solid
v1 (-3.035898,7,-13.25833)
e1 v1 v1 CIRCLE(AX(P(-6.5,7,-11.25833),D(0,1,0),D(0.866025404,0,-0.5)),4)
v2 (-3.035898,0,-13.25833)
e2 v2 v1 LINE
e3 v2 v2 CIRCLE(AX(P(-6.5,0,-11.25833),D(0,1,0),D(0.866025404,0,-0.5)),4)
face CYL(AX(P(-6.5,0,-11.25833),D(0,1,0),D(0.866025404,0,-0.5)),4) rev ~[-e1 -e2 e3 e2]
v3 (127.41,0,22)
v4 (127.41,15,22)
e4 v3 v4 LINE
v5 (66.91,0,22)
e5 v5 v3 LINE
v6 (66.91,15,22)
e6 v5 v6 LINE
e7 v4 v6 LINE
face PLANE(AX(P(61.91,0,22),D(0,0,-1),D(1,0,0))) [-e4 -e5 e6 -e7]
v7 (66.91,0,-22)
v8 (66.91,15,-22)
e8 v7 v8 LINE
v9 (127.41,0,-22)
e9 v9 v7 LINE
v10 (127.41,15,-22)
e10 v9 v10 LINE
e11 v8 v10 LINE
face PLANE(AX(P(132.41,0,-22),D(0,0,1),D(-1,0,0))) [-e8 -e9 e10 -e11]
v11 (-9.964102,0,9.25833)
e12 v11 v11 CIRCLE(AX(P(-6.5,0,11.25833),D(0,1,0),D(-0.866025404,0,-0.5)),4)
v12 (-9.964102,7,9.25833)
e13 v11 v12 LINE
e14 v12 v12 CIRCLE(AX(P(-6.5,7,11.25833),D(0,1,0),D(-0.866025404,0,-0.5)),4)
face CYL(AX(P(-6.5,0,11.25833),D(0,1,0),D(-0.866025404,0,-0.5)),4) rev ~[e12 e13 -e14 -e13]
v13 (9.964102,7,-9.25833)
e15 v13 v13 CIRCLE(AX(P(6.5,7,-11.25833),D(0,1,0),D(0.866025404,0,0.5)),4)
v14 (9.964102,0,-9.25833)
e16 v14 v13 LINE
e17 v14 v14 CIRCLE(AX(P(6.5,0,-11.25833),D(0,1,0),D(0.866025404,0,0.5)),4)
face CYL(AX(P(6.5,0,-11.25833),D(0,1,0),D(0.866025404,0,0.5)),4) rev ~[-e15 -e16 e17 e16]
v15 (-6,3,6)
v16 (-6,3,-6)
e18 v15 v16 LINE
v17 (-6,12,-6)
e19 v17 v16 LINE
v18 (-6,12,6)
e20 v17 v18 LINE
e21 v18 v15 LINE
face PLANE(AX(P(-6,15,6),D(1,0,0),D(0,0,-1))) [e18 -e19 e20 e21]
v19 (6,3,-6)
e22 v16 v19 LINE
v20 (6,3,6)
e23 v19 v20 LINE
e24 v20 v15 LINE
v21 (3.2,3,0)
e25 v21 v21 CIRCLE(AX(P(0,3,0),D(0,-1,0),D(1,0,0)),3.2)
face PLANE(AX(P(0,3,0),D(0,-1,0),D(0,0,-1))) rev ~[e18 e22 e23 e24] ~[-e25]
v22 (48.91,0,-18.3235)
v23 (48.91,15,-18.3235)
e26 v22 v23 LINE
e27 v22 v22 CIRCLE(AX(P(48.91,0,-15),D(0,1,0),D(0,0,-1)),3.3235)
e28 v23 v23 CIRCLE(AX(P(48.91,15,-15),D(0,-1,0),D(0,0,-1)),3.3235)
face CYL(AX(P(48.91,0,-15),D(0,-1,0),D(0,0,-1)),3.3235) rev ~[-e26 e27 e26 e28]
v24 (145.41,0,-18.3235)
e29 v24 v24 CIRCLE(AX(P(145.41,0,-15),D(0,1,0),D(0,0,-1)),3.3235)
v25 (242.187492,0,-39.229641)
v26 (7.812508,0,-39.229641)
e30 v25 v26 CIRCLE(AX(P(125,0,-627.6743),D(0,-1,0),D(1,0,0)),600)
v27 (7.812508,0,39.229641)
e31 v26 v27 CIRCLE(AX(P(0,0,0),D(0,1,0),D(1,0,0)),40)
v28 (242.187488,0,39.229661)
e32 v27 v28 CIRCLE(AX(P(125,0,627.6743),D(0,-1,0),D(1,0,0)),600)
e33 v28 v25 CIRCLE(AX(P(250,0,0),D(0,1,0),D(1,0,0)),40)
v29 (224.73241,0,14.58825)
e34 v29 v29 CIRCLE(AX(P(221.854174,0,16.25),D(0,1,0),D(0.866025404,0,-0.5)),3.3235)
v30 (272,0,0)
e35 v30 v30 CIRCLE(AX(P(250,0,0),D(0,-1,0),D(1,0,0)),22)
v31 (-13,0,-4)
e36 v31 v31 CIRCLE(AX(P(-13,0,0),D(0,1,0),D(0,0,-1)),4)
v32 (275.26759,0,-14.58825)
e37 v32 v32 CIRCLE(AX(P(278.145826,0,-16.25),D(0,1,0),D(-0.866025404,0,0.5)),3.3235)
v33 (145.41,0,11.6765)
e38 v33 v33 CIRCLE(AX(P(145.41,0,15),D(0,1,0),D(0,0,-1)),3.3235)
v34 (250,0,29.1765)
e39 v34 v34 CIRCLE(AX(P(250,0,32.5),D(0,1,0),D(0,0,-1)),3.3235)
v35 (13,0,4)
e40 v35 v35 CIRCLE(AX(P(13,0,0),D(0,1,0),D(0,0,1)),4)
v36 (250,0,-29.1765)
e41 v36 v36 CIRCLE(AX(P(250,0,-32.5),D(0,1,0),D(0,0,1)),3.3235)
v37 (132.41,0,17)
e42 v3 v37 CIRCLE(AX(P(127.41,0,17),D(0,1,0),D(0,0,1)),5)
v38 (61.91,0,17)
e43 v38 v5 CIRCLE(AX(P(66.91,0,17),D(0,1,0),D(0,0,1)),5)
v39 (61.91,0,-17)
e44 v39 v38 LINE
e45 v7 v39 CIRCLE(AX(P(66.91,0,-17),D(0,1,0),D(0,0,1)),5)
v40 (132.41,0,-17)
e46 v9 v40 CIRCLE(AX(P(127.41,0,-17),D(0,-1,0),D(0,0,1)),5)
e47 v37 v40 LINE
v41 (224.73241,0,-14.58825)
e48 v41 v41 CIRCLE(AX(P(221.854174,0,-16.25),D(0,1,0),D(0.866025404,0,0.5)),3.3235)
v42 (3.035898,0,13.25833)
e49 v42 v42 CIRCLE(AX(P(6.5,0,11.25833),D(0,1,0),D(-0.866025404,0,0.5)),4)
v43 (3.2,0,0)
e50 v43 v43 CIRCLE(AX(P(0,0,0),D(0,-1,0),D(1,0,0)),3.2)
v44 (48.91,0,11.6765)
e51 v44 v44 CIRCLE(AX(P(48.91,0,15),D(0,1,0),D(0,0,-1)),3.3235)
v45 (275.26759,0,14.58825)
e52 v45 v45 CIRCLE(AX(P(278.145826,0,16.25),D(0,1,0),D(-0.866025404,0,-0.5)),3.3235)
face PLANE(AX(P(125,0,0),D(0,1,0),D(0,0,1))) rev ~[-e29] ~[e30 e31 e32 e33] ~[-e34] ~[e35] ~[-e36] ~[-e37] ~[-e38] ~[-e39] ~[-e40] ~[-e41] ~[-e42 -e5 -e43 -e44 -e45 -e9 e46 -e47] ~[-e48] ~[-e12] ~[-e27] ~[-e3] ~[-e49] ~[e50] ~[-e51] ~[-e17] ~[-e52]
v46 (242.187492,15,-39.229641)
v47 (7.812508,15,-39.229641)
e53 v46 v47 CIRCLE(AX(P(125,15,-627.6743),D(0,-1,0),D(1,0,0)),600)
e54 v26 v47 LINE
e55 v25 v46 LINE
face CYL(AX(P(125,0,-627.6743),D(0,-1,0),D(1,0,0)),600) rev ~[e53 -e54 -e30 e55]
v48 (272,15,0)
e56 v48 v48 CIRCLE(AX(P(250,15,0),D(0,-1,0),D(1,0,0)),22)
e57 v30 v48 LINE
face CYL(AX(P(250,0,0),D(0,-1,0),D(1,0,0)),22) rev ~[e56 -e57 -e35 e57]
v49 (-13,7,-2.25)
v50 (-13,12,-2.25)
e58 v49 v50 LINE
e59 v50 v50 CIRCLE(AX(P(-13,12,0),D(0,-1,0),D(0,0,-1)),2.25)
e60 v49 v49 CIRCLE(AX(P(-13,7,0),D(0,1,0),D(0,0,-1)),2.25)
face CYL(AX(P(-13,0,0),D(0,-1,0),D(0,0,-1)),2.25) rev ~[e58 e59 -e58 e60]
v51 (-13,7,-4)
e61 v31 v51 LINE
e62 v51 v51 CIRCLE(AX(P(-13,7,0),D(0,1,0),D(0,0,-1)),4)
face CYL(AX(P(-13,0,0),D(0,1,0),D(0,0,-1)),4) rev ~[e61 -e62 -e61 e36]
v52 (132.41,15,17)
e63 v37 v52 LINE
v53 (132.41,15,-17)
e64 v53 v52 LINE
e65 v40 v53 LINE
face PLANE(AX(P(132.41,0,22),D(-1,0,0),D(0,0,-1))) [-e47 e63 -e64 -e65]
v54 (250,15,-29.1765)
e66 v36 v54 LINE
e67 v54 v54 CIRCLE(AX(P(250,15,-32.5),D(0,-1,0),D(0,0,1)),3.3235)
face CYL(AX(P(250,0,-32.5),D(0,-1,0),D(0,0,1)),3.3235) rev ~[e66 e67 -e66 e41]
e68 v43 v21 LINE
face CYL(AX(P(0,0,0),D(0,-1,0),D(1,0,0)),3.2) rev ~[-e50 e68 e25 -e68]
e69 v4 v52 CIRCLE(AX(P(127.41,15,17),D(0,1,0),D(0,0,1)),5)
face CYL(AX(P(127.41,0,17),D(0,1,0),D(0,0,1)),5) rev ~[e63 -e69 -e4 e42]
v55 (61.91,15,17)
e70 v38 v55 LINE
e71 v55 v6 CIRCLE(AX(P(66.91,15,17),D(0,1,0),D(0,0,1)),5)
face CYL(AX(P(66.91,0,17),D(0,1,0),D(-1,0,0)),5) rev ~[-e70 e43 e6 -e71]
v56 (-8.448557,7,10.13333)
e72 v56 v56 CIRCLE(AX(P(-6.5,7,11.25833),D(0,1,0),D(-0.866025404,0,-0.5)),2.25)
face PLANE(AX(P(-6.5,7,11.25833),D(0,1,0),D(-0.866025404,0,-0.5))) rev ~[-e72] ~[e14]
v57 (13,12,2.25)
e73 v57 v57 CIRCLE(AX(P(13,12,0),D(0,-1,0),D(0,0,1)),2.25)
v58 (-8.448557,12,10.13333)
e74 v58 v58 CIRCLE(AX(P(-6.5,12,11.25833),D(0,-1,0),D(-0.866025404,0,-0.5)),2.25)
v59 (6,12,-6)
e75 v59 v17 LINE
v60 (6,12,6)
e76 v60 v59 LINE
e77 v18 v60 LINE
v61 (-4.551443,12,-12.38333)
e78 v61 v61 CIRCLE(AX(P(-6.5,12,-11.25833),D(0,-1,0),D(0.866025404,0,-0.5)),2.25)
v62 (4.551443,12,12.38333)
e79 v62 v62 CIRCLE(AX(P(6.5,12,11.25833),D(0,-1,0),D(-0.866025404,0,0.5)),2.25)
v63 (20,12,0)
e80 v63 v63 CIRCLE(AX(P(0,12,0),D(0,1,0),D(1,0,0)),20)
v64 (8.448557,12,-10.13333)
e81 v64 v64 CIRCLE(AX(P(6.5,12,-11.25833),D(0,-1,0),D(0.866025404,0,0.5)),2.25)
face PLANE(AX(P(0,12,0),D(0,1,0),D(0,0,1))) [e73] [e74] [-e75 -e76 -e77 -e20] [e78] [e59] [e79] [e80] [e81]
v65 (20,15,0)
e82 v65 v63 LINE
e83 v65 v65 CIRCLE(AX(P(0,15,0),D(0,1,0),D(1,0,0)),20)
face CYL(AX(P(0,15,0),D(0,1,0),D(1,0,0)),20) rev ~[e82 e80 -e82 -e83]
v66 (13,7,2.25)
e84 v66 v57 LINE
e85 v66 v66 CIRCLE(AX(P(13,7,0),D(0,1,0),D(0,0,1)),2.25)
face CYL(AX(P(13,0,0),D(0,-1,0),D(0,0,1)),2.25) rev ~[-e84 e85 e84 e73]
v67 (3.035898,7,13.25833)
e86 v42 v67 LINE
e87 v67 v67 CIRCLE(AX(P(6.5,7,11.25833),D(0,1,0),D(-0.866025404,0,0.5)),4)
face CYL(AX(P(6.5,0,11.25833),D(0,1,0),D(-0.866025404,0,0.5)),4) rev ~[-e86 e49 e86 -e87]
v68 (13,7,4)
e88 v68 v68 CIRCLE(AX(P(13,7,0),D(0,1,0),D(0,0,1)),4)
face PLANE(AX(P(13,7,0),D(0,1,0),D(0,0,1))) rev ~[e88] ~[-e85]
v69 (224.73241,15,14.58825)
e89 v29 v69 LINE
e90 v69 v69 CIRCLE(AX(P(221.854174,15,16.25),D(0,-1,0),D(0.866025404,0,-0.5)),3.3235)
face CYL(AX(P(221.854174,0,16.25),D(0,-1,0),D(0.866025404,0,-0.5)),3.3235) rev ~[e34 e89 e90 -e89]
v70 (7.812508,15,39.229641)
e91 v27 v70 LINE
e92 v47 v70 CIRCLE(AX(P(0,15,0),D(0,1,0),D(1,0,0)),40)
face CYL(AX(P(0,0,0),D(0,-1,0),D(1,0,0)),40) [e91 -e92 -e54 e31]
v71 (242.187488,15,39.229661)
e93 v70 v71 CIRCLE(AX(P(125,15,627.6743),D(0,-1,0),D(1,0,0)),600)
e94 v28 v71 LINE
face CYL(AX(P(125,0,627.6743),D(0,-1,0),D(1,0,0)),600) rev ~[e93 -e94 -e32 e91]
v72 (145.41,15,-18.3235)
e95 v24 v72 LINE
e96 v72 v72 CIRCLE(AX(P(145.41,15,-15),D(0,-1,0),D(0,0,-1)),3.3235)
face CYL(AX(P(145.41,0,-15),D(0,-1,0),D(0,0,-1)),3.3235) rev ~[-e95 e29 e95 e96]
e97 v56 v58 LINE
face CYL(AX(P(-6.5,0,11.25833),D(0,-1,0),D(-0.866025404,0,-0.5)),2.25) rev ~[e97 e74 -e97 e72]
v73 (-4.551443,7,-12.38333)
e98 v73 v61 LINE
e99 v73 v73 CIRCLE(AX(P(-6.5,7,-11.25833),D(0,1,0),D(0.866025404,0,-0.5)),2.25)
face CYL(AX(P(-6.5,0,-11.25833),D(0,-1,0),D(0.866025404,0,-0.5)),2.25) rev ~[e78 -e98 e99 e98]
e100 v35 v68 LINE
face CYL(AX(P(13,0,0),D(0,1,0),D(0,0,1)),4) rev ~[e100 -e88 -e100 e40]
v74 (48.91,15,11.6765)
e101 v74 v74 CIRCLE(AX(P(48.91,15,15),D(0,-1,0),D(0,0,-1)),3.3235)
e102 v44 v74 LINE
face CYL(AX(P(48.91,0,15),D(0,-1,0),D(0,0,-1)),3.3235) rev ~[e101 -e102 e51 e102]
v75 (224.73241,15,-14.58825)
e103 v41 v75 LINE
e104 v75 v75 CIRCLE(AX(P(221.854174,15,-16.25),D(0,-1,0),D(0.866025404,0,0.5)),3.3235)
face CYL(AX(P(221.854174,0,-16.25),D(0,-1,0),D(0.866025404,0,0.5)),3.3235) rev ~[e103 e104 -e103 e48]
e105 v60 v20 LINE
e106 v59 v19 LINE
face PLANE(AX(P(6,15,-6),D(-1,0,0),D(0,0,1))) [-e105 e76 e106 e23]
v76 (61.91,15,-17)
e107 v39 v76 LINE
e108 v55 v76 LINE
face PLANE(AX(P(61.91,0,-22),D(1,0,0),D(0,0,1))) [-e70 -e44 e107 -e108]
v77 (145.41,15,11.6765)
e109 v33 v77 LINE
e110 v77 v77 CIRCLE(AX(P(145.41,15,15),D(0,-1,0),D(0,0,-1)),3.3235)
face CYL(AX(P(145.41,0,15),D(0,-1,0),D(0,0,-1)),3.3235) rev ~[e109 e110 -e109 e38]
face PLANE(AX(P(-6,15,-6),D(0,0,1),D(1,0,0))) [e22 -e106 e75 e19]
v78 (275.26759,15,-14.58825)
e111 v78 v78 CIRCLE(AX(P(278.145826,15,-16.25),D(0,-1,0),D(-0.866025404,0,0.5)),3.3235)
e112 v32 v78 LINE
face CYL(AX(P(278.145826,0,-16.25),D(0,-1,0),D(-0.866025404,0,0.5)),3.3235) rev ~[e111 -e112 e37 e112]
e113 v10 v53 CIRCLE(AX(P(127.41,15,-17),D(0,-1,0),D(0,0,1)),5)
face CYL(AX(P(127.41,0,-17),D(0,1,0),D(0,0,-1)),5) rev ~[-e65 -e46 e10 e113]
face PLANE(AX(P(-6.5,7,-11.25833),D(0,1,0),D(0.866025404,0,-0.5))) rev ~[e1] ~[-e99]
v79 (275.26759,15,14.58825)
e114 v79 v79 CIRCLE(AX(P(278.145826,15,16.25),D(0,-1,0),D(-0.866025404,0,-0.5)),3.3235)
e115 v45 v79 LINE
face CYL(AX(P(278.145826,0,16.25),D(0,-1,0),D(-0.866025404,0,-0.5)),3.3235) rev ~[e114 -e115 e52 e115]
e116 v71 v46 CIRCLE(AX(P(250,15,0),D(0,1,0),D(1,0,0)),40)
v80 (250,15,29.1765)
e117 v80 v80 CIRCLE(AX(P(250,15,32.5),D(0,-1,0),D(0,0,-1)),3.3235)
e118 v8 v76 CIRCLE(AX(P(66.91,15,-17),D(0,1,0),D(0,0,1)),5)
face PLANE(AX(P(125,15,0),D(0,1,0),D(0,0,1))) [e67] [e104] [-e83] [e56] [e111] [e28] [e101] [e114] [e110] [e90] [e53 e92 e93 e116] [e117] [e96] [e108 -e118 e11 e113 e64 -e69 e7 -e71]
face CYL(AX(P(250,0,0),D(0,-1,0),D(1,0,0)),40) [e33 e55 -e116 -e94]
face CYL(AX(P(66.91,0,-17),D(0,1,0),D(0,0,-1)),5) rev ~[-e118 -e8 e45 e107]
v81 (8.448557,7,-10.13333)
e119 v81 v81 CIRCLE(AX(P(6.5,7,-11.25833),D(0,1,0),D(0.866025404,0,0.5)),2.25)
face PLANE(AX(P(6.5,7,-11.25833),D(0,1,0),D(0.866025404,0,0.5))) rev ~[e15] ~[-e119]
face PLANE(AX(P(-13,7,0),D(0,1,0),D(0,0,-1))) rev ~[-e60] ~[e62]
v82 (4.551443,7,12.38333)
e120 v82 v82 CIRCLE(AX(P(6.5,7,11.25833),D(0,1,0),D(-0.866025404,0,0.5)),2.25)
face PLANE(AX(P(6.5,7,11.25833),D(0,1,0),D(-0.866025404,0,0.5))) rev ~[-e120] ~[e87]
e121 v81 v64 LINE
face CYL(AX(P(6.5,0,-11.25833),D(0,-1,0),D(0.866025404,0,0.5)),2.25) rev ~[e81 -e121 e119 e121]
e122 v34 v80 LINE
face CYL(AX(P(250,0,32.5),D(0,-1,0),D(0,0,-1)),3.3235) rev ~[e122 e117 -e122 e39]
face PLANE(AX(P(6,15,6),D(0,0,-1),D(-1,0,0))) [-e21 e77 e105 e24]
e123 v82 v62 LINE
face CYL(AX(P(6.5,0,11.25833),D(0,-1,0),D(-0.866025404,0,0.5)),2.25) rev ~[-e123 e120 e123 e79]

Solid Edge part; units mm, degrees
sketch "Sketch1" plane through (0, 0, 0) normal (0, -1, 0) x (1, 0, 0)
  arc A0 (7.8125, -39.2296) -> (7.8125, 39.2296) centre (0, 0) cw
  arc A1 (7.8125, 39.2296) -> (242.1875, 39.2296) centre (125, 627.6743) ccw
  arc A2 (242.1875, 39.2296) -> (242.1875, -39.2296) centre (250, 0) cw
  arc A3 (242.1875, -39.2296) -> (7.8125, -39.2296) centre (125, -627.6743) ccw
  dimension "D1" = 39.2296
extrude "Protrusion1" add sketch "Sketch1" against normal blind 15
sketch "Sketch2" plane through (125, 0, 0) normal (0, -1, 0) x (1, 0, 0)
  circle A0 centre (125, 0) radius 22
  dimension "D1" = 44
extrude "Cutout1" cut sketch "Sketch2" against normal through all
hole "Agujero_1" at (250, 0, 32.5) direction (0, 1, 0) diameter 6.647 end up to next
pattern_circular "Pattern1" count 6 over 360 about axis through (250, 0, 0) along (0, 1, 0) of "Agujero_1"
sketch "Sketch3" plane through (125, 0, 0) normal (0, -1, 0) x (1, 0, 0)
  circle A0 centre (-125, 0) radius 3.2
  dimension "D1" = 6.4
extrude "Cutout2" cut sketch "Sketch3" against normal through all
sketch "Sketch4" plane through (125, 15, 0) normal (0, 1, 0) x (1, 0, 0)
  line L0 (-119, -6) -> (-131, -6)
  line L1 (-131, -6) -> (-131, 6)
  line L2 (-131, 6) -> (-119, 6)
  line L3 (-119, 6) -> (-119, -6)
  dimension "D1" = 12
  dimension "D2" = 12
extrude "VaciadoExtruido_3" cut sketch "Sketch4" against normal blind 12
sketch "Sketch5" plane through (125, 15, 0) normal (0, 1, 0) x (1, 0, 0)
  circle A0 centre (-125, 0) radius 20
  dimension "D1" = 40
extrude "VaciadoExtruido_4" cut sketch "Sketch5" against normal blind 3
hole "Agujero_7" at (-13, 0, 0) direction (0, 1, 0) diameter 4.5 end up to next counterbore diameter 8 counterbore depth 7
pattern_circular "Pattern2" count 6 over 360 about axis through (0, 0, 0) along (0, 1, 0) of "Agujero_7"
hole "Agujero_13" at (48.91, 0, 15) direction (0, 1, 0) diameter 6.647 end up to next
hole "Hole11" at (145.41, 0, 15) direction (0, 1, 0) diameter 6.647 end up to next
hole "Hole12" at (145.41, 0, -15) direction (0, 1, 0) diameter 6.647 end up to next
hole "Hole13" at (48.91, 0, -15) direction (0, 1, 0) diameter 6.647 end up to next
sketch "Sketch6" plane through (125, 0, 0) normal (0, -1, 0) x (1, 0, 0)
  line L0 (7.41, -22) -> (-63.09, -22)
  line L1 (-63.09, -22) -> (-63.09, 22)
  line L2 (-63.09, 22) -> (7.41, 22)
  line L3 (7.41, 22) -> (7.41, -22)
  dimension "D1" = 70.5
  dimension "D2" = 44
  dimension "D3" = 97.16
extrude "Cutout3" cut sketch "Sketch6" against normal through all
fillet "Redondeo_1" radius 5 4 edges at (61.91, 7.5, 22) (132.41, 7.5, 22) (61.91, 7.5, -22) (132.41, 7.5, -22)
